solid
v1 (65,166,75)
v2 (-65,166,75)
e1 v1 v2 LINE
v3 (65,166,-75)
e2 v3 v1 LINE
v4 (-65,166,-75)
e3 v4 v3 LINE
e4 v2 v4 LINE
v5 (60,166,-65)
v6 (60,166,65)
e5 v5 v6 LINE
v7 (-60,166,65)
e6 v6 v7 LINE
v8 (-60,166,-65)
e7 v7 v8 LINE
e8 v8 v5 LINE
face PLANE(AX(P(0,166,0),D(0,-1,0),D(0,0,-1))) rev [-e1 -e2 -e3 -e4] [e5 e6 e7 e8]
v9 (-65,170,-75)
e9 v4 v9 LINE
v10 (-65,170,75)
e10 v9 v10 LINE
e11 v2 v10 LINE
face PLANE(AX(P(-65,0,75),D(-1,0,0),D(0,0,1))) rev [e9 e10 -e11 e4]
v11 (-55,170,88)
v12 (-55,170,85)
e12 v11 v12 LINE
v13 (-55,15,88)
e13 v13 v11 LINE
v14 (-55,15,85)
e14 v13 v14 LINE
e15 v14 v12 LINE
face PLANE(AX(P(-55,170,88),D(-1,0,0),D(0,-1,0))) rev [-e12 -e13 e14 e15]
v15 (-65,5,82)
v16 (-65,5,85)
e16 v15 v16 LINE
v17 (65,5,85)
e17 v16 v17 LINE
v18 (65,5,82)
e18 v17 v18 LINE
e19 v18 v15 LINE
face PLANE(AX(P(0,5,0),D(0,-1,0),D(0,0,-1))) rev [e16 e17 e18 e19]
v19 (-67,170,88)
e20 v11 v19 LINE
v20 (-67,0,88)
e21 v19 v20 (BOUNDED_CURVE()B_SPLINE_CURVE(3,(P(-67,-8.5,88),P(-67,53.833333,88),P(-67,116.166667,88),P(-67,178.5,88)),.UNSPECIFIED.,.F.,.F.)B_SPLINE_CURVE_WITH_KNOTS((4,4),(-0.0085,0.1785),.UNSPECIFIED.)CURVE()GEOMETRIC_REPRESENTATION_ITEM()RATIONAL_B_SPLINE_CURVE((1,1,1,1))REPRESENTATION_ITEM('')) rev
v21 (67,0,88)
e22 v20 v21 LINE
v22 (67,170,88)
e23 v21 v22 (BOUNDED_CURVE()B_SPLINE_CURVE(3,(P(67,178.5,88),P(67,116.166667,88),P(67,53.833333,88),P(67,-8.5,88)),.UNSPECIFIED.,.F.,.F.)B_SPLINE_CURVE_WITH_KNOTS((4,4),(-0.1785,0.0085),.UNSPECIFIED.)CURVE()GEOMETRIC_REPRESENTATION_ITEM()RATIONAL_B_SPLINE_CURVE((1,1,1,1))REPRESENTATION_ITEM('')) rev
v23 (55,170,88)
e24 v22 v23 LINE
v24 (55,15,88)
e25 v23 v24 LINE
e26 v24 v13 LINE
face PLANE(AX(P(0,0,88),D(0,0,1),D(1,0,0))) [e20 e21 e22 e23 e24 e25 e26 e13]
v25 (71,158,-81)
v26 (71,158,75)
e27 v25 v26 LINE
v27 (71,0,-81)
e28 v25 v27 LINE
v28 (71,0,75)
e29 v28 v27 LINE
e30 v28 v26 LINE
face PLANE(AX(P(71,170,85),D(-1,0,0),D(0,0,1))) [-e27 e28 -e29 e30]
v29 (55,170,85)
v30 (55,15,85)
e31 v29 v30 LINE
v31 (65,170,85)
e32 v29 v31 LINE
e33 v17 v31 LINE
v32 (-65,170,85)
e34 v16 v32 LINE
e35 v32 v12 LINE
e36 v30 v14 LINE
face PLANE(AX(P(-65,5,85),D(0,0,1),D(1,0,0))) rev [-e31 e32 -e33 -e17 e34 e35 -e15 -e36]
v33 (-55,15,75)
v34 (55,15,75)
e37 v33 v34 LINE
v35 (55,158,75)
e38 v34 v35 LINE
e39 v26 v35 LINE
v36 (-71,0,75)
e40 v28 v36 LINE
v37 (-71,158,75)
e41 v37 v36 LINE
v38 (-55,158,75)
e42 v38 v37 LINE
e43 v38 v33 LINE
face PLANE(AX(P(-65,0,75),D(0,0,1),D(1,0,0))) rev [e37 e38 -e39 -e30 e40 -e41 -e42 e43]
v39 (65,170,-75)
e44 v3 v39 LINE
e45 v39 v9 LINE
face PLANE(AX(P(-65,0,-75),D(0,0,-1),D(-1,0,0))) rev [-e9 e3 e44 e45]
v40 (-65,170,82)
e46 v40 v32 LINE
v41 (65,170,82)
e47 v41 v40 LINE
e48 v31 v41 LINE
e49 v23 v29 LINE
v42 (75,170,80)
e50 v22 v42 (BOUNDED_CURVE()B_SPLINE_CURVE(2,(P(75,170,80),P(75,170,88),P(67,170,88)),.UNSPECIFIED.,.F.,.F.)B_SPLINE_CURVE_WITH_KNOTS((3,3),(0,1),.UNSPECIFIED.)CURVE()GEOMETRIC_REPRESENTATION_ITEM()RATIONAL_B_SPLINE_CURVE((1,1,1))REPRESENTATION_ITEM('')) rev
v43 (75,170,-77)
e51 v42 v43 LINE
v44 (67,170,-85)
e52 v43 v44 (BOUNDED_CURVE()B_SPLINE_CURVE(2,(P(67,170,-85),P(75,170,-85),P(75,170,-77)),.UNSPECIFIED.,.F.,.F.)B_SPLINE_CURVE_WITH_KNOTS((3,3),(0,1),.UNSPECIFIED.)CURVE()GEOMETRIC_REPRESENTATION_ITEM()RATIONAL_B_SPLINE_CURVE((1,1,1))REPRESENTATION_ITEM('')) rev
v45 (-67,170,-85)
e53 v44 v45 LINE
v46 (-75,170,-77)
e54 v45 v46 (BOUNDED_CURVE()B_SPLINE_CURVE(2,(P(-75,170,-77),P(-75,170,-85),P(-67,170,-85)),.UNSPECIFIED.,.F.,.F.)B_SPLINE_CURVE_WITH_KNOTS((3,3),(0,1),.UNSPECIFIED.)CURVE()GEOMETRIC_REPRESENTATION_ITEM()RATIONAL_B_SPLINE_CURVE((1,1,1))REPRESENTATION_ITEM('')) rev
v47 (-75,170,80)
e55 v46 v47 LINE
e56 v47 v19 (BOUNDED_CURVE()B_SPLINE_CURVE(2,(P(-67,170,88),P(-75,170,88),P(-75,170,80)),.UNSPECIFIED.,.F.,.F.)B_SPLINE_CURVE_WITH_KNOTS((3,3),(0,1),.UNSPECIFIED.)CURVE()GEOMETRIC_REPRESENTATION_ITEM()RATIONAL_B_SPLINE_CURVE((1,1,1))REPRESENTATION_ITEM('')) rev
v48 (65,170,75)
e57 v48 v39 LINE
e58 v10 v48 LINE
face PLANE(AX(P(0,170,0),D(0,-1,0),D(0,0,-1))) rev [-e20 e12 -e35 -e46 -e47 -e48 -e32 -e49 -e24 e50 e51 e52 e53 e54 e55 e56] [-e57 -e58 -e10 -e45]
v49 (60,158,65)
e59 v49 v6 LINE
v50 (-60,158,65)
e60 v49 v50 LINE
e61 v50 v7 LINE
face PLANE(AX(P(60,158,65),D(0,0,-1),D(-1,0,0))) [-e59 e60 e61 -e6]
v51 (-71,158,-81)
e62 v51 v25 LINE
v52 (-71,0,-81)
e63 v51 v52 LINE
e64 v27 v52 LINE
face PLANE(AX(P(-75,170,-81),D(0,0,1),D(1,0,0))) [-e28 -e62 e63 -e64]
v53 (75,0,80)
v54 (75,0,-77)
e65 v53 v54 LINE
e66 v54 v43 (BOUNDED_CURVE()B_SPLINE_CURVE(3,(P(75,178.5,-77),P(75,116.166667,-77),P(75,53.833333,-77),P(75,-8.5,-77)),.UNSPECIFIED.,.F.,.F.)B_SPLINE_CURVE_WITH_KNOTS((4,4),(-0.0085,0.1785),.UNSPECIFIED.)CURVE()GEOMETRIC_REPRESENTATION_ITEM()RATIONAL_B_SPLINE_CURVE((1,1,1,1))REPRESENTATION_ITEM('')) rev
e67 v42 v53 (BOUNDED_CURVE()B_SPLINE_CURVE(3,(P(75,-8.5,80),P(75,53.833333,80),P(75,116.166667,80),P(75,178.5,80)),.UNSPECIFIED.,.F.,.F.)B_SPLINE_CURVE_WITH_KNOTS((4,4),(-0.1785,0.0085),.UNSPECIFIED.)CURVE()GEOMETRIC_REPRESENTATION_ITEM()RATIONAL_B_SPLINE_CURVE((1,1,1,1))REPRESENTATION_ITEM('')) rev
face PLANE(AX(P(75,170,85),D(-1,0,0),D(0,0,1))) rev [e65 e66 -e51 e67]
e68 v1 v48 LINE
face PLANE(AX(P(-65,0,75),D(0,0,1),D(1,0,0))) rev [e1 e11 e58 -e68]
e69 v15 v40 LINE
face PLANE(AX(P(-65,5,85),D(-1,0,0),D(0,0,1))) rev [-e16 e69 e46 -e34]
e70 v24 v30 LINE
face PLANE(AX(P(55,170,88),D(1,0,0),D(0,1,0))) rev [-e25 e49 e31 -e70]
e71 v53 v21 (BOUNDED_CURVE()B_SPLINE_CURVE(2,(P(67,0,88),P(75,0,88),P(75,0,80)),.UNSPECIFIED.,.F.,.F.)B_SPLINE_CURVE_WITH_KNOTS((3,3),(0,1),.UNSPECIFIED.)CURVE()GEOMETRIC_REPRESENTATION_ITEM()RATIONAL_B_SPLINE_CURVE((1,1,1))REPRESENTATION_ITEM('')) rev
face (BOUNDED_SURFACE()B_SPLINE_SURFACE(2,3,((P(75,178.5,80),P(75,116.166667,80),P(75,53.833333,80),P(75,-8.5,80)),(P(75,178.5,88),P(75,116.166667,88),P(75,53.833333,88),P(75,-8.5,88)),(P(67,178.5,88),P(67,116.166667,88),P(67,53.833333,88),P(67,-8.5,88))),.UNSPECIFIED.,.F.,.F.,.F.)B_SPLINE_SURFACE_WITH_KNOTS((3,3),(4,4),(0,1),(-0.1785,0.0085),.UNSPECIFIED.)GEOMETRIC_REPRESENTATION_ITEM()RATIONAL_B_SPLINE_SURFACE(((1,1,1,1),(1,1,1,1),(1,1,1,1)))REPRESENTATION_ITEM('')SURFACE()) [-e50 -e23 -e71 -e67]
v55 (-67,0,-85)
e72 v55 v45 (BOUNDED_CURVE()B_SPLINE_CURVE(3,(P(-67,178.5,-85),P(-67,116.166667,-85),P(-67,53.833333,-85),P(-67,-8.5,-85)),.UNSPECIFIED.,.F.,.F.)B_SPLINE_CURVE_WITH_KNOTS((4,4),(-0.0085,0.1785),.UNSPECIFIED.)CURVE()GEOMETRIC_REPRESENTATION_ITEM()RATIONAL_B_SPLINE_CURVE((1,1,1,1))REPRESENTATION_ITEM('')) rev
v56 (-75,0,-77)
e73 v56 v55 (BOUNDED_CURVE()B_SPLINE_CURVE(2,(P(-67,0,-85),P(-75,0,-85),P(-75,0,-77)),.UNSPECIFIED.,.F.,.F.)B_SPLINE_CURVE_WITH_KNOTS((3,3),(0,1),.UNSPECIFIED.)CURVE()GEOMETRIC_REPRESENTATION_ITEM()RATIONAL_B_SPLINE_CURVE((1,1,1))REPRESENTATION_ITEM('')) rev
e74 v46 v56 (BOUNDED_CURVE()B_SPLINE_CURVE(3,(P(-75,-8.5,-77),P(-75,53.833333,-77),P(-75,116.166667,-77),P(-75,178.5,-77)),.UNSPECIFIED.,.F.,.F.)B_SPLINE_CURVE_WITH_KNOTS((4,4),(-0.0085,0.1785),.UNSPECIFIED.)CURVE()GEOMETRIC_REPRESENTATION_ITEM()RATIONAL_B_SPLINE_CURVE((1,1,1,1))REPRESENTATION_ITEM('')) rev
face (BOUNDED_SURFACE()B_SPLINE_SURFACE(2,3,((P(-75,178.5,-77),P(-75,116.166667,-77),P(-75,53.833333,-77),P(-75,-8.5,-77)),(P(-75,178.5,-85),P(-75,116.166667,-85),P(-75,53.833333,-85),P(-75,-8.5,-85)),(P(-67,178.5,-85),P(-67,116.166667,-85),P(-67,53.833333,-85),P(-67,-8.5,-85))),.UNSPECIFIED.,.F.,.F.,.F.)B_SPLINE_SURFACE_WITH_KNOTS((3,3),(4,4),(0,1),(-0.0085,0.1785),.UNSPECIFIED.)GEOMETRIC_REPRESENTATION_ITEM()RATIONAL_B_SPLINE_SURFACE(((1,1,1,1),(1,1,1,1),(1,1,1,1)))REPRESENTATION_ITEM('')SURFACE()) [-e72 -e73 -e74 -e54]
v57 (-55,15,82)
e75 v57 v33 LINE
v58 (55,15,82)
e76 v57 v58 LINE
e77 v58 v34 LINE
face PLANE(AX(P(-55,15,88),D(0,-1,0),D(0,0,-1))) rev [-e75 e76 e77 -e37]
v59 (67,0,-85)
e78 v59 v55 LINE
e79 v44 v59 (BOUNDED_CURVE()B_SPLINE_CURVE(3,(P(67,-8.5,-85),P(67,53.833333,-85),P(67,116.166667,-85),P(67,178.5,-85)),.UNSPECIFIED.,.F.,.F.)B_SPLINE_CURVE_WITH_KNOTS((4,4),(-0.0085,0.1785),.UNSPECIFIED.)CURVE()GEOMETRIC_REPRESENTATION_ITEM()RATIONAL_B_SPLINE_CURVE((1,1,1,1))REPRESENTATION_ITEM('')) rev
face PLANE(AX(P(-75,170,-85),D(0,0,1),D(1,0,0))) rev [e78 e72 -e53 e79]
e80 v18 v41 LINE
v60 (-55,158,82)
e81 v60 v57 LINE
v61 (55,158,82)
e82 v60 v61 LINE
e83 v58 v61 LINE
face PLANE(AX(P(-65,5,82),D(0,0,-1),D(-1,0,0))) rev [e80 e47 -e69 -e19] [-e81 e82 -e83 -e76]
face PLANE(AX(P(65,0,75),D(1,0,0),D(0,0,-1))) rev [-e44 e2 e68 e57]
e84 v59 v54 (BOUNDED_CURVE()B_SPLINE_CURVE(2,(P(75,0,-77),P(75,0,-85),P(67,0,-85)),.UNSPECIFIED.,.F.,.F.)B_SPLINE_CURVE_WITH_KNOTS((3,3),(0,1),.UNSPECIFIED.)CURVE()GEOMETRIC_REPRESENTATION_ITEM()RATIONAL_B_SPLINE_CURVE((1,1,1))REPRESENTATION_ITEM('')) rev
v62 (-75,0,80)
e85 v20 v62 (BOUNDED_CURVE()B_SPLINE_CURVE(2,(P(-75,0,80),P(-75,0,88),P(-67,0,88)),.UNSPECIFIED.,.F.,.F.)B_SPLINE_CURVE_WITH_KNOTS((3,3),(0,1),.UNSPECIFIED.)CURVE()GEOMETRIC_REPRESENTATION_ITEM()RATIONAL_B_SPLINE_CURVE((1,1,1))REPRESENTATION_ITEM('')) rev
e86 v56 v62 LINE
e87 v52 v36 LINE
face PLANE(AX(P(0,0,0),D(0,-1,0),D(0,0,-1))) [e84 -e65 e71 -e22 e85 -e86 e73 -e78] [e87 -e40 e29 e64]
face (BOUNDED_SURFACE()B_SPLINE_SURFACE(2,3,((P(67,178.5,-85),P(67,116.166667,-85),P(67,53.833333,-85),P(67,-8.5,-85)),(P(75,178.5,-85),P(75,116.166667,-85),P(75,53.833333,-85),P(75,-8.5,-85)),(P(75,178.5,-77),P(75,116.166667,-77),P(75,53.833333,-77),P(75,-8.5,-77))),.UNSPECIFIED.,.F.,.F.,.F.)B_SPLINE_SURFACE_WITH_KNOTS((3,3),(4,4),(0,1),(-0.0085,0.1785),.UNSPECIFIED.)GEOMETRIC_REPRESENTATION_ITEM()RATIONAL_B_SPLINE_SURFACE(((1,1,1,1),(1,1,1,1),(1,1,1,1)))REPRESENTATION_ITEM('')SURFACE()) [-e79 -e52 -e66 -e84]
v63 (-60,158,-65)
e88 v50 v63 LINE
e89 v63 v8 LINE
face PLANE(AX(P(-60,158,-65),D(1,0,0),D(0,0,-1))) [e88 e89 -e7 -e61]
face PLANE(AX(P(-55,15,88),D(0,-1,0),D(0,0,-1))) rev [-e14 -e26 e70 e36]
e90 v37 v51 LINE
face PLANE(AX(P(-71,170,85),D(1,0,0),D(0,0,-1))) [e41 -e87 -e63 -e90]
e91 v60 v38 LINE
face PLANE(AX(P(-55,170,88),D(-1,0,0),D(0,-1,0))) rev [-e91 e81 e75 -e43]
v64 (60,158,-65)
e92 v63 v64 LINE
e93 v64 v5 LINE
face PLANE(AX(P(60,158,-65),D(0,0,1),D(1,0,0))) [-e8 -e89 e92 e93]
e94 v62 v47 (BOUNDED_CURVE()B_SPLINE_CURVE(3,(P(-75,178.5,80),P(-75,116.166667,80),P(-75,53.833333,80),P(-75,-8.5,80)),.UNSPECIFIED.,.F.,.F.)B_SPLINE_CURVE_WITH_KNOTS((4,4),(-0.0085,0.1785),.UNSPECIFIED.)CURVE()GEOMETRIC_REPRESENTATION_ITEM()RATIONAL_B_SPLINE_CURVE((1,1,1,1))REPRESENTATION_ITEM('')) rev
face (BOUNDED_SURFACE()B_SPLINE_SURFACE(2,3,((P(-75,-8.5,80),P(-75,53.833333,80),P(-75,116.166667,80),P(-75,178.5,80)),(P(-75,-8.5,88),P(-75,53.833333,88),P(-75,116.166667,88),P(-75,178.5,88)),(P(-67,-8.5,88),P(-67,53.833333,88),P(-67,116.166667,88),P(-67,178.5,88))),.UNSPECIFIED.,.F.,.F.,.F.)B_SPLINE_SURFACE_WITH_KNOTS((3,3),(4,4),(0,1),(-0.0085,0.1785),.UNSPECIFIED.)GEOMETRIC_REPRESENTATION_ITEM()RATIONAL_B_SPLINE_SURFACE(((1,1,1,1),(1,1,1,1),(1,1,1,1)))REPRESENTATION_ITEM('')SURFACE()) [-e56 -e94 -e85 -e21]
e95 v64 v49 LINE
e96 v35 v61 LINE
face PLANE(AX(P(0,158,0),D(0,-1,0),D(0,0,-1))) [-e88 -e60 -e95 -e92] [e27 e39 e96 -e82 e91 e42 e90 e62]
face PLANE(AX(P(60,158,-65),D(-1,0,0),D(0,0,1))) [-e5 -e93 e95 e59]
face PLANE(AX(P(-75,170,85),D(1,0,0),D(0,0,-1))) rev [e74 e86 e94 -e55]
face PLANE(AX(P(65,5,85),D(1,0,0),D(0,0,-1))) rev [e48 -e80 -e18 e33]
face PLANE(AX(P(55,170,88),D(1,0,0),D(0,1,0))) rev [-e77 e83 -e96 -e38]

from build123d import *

# Parameters (mm, degrees)
SKETCH_2_W                  = 150
SKETCH_2_H                  = 170
EXTRUDE_2_DEPTH             = 170
SHELL_5_T                   = -4
SKETCH_3_W                  = 130
SKETCH_3_H                  = 150
CUT_EXTRUDE_1_DEPTH         = 205.328167417
SKETCH_4_W                  = 150
SKETCH_4_H                  = 170
SKETCH_4_W_2                = 120
SKETCH_4_H_2                = 130
EXTRUDE_3_DEPTH             = 8
EXTRUDE_4_REACH             = 253.843
EXTRUDE_4_DIRECTION_2_DEPTH = 3
SKETCH_6_W                  = 130
SKETCH_6_H                  = 3
CUT_EXTRUDE_2_DEPTH         = 165
FILLET_1_SIZE               = 8


with BuildPart() as part:
    # 草圖2 → 填料-伸長2 (new body)
    with BuildSketch(Plane(origin=(0, 0, 0), x_dir=(1, 0, 0), z_dir=(0, 1, 0))):
        Rectangle(SKETCH_2_W, SKETCH_2_H)
    extrude(amount=EXTRUDE_2_DEPTH)

    # 薄殼5
    shell_5_openings = [part.faces().sort_by_distance(p)[0] for p in [
        (0, 0, 0),
        (0, 85, 85),
    ]]
    offset(amount=SHELL_5_T, openings=shell_5_openings, kind=Kind.INTERSECTION)

    # 草圖3 → 除料-伸長1 (cut, through all)
    with BuildSketch(Plane(origin=(0, 170, 0), x_dir=(1, 0, 0), z_dir=(0, 1, 0))):
        Rectangle(SKETCH_3_W, SKETCH_3_H)
    extrude(amount=-CUT_EXTRUDE_1_DEPTH, mode=Mode.SUBTRACT)

    # 草圖4 → 填料-伸長3 (add)
    with BuildSketch(Plane.XZ.offset(-166)):
        Rectangle(SKETCH_4_W, SKETCH_4_H)
        Rectangle(SKETCH_4_W_2, SKETCH_4_H_2, mode=Mode.SUBTRACT)
    extrude(amount=EXTRUDE_3_DEPTH)

    # 填料-伸長4: up to this face of the body (flat: up to its plane)
    extrude_4_end = Plane(part.part.faces().sort_by_distance((0, 168, 75))[0])
    # 草圖5 → 填料-伸長4 (add, up to the picked face)
    with BuildSketch(Plane.XY.offset(85), mode=Mode.PRIVATE) as extrude_4_sk1:
        Polygon((55, 170), (75, 170), (75, 0), (-75, 0), (-75, 170), (-55, 170), (-55, 15), (55, 15), align=None)
    extrude_4_tool1 = split(extrude(extrude_4_sk1.sketch, amount=-EXTRUDE_4_REACH, mode=Mode.PRIVATE), bisect_by=extrude_4_end, keep=Keep.BOTH, mode=Mode.PRIVATE)
    add(extrude_4_tool1.solids().sort_by(Axis((65, 167.732843, 85), (0, 0, -1)))[0])

    # 草圖5 → 填料-伸長4 direction 2 (add)
    with BuildSketch(Plane.XY.offset(85)):
        Polygon((55, 170), (75, 170), (75, 0), (-75, 0), (-75, 170), (-55, 170), (-55, 15), (55, 15), align=None)
    extrude(amount=EXTRUDE_4_DIRECTION_2_DEPTH)

    # 草圖6 → 除料-伸長2 (cut)
    with BuildSketch(Plane(origin=(0, 170, 0), x_dir=(1, 0, 0), z_dir=(0, 1, 0))):
        with Locations((0, -83.5)):
            Rectangle(SKETCH_6_W, SKETCH_6_H)
    extrude(amount=-CUT_EXTRUDE_2_DEPTH, mode=Mode.SUBTRACT)

    # 圓角1
    # a fillet whose section is not a circle: 8 mm, written as the material it takes off along each edge
    with BuildSketch(Plane(origin=(75, -20, -85), x_dir=(0, 0, 1), z_dir=(0, 1, 0)), Plane(origin=(-75, -20, -85), x_dir=(1, 0, 0), z_dir=(0, 1, 0)), Plane(origin=(75, 190, 88), x_dir=(0, 0, -1), z_dir=(0, -1, 0)), Plane(origin=(-75, -20, 88), x_dir=(0, 0, -1), z_dir=(0, 1, 0))) as fillet_1_piece_1:
        with BuildLine():
            Bezier((FILLET_1_SIZE, 0), (0, 0), (0, -FILLET_1_SIZE), weights=[1, 1, 1])
            Line((0, -FILLET_1_SIZE), (0, 0))
            Line((0, 0), (FILLET_1_SIZE, 0))
        make_face()
    extrude(amount=210, mode=Mode.SUBTRACT)


solid = part.part
